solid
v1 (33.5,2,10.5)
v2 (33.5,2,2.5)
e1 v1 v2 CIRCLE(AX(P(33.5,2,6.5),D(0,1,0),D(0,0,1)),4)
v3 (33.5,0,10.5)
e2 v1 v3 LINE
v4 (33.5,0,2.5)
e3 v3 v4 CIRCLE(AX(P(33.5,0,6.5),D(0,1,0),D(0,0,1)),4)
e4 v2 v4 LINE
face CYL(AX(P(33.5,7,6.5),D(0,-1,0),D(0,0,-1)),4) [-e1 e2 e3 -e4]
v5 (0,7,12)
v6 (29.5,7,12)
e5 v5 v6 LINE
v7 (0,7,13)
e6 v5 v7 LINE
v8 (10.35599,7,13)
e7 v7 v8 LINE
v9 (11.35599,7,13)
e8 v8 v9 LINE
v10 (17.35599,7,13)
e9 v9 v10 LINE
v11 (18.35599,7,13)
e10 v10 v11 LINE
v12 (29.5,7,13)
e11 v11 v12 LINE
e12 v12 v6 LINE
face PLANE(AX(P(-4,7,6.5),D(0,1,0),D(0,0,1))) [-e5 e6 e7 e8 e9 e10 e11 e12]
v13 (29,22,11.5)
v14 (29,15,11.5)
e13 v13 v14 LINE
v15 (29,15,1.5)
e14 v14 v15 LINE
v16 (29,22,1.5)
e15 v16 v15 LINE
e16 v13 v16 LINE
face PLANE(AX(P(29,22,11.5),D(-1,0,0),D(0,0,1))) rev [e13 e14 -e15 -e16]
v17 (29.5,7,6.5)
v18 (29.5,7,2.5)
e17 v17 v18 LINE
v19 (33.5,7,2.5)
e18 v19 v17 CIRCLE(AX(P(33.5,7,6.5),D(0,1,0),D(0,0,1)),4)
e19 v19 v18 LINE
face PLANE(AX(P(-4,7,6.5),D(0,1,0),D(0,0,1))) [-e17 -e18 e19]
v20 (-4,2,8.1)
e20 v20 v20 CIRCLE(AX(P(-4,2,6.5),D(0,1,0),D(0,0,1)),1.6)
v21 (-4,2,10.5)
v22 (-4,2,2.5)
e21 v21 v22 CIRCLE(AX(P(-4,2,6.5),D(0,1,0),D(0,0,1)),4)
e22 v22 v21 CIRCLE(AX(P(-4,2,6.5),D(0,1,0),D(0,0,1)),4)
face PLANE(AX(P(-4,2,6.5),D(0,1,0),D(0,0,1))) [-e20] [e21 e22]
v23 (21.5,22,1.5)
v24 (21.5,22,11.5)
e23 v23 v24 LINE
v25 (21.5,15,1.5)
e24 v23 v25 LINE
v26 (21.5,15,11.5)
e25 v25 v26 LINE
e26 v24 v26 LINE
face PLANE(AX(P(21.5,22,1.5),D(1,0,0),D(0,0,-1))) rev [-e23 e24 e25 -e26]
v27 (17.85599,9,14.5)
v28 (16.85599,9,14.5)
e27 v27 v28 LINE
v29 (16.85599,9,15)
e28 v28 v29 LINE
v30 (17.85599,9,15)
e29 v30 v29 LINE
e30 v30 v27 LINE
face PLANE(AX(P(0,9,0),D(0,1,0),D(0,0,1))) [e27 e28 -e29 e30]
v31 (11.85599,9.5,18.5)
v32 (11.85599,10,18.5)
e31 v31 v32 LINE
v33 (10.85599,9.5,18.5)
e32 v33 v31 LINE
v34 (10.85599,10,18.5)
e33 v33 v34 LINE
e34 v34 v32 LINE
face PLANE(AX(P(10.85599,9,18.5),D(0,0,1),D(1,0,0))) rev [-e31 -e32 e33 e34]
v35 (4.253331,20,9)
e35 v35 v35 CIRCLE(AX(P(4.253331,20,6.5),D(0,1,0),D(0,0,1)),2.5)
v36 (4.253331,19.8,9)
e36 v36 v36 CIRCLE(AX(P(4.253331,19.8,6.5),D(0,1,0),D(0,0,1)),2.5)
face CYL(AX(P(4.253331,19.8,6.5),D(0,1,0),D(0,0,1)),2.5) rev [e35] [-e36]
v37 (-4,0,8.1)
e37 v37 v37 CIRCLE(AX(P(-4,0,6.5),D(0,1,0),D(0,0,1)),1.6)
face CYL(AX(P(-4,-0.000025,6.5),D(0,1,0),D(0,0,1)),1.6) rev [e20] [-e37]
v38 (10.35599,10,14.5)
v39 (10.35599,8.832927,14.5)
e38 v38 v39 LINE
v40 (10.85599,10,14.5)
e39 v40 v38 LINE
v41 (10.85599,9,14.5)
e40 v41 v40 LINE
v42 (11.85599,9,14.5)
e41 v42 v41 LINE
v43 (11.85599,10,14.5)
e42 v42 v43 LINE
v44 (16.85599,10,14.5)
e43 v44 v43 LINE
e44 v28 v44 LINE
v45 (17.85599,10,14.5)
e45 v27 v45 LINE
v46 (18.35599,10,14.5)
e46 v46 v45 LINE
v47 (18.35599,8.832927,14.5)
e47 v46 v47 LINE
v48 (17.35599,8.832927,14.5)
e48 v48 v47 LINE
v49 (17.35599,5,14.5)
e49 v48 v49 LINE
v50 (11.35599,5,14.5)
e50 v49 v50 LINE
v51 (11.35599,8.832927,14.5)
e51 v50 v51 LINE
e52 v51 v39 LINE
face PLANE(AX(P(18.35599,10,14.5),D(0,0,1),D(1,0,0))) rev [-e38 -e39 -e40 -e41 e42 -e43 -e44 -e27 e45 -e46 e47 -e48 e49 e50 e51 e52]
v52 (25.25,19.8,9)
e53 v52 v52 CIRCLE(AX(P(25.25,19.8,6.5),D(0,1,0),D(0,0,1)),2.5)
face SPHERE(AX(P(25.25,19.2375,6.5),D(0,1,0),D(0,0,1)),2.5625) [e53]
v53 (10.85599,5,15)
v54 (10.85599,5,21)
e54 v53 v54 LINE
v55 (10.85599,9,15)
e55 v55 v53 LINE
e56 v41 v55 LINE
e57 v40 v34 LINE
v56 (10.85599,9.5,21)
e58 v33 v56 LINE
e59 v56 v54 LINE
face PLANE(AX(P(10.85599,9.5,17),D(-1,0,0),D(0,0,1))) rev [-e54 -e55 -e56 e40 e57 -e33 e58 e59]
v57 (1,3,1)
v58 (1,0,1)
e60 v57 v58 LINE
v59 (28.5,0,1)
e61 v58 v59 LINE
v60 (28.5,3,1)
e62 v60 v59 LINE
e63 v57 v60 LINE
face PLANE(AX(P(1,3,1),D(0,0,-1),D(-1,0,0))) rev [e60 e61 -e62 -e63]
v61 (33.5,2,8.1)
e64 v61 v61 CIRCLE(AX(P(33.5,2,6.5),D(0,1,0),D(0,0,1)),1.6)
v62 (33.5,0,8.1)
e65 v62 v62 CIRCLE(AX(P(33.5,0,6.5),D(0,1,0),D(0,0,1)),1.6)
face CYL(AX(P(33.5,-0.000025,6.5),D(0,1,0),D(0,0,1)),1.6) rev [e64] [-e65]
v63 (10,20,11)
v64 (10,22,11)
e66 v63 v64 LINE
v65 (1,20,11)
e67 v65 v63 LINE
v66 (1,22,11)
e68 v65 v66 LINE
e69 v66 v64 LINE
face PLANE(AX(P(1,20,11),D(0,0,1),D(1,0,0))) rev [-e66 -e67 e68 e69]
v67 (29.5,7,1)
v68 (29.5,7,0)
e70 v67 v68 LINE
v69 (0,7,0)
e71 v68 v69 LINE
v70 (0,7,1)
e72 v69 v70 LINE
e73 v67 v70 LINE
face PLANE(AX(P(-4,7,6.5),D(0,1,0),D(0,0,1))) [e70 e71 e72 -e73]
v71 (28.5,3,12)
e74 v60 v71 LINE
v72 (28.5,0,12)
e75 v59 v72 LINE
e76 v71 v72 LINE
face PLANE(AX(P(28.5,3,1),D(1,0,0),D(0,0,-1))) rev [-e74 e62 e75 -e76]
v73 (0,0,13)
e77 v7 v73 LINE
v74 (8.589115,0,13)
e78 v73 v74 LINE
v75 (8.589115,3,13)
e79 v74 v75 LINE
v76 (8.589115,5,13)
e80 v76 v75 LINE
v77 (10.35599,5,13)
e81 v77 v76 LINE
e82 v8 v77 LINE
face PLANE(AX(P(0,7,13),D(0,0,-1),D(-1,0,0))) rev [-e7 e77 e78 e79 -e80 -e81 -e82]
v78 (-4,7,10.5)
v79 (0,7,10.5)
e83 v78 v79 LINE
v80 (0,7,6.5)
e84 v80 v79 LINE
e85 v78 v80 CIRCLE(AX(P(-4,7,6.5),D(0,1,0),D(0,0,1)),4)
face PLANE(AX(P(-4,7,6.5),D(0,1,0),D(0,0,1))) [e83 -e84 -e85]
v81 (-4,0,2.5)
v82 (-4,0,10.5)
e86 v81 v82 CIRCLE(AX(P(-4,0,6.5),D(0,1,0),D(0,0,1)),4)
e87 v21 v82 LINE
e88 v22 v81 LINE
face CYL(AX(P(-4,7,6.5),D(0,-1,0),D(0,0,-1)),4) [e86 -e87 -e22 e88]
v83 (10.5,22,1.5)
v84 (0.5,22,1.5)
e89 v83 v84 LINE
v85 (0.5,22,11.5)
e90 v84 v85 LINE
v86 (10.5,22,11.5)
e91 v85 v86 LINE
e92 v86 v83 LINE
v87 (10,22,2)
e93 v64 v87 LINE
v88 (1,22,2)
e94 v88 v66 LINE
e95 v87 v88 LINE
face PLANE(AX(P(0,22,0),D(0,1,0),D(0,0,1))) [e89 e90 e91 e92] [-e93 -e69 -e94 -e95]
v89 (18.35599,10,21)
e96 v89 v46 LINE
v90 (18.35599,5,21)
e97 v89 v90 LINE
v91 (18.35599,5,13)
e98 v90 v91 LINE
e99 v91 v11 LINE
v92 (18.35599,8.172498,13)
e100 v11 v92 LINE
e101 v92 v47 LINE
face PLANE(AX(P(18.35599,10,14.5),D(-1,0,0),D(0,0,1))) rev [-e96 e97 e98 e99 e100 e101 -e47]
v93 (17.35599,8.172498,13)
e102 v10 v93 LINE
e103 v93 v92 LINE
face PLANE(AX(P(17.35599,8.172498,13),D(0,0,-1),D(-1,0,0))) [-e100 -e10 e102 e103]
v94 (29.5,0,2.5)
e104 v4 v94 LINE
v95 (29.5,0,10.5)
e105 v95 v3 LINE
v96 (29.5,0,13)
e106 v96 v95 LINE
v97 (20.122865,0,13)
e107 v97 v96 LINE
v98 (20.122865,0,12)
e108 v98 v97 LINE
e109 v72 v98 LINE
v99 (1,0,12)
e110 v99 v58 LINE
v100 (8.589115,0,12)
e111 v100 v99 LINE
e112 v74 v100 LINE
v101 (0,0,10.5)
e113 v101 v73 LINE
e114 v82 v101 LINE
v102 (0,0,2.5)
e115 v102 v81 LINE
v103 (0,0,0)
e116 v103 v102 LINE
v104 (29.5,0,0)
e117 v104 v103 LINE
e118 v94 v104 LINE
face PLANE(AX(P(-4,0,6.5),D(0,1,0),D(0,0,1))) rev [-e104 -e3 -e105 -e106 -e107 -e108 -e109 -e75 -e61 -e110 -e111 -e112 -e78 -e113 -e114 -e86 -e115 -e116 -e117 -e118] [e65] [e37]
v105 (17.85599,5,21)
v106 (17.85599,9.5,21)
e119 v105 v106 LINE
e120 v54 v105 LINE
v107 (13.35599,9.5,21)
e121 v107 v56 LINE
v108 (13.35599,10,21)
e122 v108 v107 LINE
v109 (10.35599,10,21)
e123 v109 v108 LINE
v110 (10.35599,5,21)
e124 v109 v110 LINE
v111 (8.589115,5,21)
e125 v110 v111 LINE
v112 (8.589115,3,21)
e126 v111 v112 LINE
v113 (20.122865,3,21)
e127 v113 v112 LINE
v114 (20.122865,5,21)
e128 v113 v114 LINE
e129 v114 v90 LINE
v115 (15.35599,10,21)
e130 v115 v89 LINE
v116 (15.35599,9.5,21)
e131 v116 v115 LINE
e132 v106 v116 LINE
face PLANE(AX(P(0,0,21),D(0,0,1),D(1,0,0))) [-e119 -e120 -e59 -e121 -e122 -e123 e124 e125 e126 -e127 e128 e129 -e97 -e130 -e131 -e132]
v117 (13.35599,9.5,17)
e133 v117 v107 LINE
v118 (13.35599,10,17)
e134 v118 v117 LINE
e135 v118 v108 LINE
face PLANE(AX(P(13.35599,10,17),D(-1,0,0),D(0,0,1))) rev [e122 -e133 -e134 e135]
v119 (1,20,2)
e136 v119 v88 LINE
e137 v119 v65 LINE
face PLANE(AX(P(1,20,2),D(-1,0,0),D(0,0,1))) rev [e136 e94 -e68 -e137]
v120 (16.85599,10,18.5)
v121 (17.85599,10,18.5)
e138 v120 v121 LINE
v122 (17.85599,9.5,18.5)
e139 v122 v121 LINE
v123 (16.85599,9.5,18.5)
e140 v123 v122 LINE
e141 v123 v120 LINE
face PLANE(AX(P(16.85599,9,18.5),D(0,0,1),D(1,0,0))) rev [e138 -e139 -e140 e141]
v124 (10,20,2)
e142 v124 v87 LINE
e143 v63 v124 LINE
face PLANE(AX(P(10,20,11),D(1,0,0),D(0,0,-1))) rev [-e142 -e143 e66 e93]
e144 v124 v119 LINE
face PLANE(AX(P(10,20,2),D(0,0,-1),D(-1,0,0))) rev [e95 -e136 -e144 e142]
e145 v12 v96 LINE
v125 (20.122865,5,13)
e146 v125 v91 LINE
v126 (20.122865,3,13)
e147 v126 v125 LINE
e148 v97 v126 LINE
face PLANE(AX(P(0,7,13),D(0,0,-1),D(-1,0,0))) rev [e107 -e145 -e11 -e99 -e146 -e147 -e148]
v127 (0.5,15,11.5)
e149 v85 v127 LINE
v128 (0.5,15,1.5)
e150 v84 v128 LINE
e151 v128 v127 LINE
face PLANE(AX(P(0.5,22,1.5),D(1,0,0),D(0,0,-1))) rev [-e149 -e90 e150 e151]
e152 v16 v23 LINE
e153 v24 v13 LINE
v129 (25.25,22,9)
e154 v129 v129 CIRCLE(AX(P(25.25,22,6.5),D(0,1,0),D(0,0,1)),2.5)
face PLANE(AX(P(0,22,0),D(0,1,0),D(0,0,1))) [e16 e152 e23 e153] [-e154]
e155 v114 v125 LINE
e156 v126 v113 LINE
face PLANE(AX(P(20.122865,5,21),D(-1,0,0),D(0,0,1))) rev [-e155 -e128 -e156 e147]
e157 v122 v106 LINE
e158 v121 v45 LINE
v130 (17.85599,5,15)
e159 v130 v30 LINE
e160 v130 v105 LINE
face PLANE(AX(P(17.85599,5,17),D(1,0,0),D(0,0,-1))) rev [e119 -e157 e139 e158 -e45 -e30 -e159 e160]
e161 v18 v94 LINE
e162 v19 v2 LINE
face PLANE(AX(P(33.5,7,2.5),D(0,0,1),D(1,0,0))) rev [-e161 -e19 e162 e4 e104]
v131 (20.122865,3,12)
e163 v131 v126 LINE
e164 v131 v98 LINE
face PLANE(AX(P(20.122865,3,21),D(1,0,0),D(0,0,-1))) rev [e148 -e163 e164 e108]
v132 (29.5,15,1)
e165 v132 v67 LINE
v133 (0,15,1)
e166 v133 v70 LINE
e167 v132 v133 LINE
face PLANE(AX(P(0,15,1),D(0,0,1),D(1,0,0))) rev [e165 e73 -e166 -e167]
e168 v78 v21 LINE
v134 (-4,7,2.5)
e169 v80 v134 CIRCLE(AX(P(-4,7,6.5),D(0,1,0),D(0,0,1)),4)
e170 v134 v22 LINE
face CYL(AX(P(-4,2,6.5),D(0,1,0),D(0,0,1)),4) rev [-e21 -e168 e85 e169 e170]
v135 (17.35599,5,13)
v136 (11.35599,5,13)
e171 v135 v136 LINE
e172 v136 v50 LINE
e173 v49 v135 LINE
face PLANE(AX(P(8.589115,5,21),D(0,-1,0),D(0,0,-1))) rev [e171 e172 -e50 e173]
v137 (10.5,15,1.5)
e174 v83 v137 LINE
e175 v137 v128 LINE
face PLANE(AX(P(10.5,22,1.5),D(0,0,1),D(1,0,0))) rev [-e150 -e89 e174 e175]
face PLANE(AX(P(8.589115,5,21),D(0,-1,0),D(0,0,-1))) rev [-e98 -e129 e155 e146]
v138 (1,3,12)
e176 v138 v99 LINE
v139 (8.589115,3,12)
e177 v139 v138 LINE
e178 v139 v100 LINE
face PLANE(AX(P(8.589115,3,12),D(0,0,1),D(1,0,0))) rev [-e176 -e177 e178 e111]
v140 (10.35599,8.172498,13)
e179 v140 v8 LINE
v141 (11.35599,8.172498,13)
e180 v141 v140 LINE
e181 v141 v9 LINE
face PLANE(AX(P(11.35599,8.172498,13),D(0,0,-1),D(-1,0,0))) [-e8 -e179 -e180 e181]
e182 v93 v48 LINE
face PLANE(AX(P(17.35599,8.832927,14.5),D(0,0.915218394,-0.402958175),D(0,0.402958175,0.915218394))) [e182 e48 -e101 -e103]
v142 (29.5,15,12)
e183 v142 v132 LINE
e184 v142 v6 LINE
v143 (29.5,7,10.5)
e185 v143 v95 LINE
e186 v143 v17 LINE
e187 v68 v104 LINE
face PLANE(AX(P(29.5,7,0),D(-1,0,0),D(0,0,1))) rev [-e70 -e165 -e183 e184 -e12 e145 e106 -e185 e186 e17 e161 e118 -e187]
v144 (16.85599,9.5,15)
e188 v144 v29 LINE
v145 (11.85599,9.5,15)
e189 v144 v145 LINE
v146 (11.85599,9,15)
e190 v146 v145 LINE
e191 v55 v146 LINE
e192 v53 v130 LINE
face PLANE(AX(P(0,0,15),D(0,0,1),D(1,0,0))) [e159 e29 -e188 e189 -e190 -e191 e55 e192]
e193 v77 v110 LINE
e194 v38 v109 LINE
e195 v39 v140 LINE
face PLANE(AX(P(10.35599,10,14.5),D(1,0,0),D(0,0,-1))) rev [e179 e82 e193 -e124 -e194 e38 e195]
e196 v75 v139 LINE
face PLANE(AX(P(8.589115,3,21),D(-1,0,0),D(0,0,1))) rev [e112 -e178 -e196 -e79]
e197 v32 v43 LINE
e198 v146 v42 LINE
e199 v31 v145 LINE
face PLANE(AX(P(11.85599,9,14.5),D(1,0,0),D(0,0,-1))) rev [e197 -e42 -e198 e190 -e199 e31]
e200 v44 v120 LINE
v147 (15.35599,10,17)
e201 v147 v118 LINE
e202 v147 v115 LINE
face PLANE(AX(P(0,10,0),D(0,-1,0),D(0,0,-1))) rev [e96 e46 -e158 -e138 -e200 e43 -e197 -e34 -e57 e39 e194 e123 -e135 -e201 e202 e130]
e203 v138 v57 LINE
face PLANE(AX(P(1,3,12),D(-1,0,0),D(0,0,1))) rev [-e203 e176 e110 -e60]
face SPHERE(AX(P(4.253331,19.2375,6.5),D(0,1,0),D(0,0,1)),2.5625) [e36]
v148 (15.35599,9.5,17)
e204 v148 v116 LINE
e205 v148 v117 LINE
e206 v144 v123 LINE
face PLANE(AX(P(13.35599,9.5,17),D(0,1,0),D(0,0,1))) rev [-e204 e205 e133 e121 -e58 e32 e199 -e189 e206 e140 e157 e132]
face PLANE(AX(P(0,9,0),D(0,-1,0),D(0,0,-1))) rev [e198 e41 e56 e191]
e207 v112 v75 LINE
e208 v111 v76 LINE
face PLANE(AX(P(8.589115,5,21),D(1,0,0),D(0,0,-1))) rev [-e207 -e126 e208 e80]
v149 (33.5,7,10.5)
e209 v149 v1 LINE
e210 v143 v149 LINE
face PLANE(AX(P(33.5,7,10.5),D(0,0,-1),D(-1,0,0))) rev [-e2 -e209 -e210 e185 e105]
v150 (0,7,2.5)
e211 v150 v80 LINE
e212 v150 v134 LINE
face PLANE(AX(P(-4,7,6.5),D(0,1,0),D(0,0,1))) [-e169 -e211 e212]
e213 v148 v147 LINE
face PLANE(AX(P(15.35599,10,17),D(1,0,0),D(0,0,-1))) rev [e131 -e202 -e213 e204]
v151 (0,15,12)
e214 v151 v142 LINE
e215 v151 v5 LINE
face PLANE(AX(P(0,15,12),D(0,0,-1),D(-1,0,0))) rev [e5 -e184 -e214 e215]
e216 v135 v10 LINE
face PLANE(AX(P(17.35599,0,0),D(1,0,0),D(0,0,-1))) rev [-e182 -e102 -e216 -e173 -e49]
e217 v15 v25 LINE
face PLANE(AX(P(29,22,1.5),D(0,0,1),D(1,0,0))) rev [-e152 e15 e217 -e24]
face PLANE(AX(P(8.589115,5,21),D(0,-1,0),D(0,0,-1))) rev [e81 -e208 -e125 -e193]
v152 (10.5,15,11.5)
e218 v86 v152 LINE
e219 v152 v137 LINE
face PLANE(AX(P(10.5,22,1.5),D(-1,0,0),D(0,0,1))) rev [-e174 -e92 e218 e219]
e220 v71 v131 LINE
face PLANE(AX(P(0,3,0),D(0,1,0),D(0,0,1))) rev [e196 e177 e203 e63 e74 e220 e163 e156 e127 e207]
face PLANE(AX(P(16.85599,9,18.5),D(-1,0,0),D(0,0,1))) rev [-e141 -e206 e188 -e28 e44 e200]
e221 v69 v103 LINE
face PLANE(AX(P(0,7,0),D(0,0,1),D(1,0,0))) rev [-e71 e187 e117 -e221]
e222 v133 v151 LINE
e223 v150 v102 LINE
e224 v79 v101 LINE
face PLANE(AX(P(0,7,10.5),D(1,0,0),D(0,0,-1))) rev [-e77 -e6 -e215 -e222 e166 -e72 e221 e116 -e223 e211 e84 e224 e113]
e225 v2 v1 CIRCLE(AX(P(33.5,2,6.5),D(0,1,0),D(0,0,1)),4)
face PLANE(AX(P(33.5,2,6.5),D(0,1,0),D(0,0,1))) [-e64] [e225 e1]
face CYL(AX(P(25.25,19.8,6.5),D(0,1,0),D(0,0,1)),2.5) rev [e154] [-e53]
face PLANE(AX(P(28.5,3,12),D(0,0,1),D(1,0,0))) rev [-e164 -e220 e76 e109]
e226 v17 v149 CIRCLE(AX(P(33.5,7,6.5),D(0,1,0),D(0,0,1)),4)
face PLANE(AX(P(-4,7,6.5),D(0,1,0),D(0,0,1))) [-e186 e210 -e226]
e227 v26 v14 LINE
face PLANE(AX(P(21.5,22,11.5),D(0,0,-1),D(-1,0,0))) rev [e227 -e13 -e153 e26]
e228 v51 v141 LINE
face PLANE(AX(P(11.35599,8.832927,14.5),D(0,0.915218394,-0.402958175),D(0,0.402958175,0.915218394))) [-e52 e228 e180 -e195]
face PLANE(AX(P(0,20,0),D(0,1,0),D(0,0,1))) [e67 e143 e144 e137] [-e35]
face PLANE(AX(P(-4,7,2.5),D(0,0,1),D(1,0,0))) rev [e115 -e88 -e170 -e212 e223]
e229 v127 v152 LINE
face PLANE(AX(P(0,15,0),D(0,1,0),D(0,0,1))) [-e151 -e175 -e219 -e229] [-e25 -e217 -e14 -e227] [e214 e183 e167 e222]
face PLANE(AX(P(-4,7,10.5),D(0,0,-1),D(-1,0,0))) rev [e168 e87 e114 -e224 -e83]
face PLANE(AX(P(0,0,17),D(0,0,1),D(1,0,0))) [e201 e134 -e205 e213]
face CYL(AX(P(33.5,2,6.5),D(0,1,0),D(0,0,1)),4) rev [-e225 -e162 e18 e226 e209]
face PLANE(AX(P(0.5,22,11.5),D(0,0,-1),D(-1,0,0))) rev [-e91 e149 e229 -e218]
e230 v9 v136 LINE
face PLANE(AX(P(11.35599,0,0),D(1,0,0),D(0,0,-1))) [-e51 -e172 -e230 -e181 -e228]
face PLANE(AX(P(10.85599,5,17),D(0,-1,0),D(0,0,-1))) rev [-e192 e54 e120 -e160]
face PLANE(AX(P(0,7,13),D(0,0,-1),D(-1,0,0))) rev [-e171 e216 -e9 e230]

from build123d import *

# Parameters (mm, degrees)
EXTRUDE_1_DEPTH     = 7
CUT_EXTRUDE_START   = -5
SKETCH_2_R          = 4
CUT_EXTRUDE_1_DEPTH = 5
SKETCH_3_W          = 29.5
SKETCH_3_H          = 11
EXTRUDE_2_DEPTH     = 8
SKETCH_4_W          = 7.5
SKETCH_4_H          = 10
SKETCH_4_W_2        = 10
EXTRUDE_3_DEPTH     = 7
SKETCH_5_W          = 9
SKETCH_5_H          = 9
CUT_EXTRUDE_2_DEPTH = 2
SKETCH_6_R          = 2.5
CUT_EXTRUDE_3_DEPTH = 2.2
SKETCH_7_R          = 1.6
CUT_EXTRUDE_4_DEPTH = 45.443784717
SKETCH_8_W          = 11.533749137
SKETCH_8_H          = 5
EXTRUDE_4_DEPTH     = 8
CUT_EXTRUDE_5_DEPTH = 3
SKETCH_11_W         = 8
SKETCH_11_H         = 6.5
EXTRUDE_6_DEPTH     = 5
EXTRUDE_7_DEPTH     = 1
EXTRUDE_8_DEPTH     = 1
CUT_EXTRUDE_6_DEPTH = 4
SKETCH_15_W         = 7
SKETCH_15_H         = 4.5
CUT_EXTRUDE_7_DEPTH = 2
SKETCH_16_W         = 1
SKETCH_16_H         = 4
CUT_EXTRUDE_8_DEPTH = 1


# Read off the part's stored shape, not the designer's step: 圆顶1, 圆顶2
with BuildPart() as part:
    # 草图1 → 凸台-拉伸1 (new body)
    with BuildSketch(Plane(origin=(0, 0, 0), x_dir=(1, 0, 0), z_dir=(0, 1, 0))):
        with BuildLine():
            Line((0, 0), (29.5, 0))
            Line((29.5, 0), (29.5, -2.5))
            Line((29.5, -2.5), (33.5, -2.5))
            ThreePointArc((33.5, -2.5), (37.5, -6.5), (33.5, -10.5))
            Line((33.5, -10.5), (29.5, -10.5))
            Line((29.5, -10.5), (29.5, -13))
            Line((29.5, -13), (0, -13))
            Line((0, -13), (0, -10.5))
            Line((0, -10.5), (-4, -10.5))
            ThreePointArc((-4, -10.5), (-8, -6.5), (-4, -2.5))
            Line((-4, -2.5), (0, -2.5))
            Line((0, -2.5), (0, 0))
        make_face()
    extrude(amount=EXTRUDE_1_DEPTH)

    # 草图2 → 切除-拉伸1 (cut)
    with BuildSketch(Plane(origin=(0, 7, 0), x_dir=(1, 0, 0), z_dir=(0, 1, 0)).offset(CUT_EXTRUDE_START)):
        with Locations((-4, -6.5)):
            Circle(SKETCH_2_R)
        with Locations((33.5, -6.5)):
            Circle(SKETCH_2_R)
    extrude(amount=CUT_EXTRUDE_1_DEPTH, mode=Mode.SUBTRACT)

    # 草图3 → 凸台-拉伸2 (add)
    with BuildSketch(Plane(origin=(0, 7, 0), x_dir=(1, 0, 0), z_dir=(0, 1, 0))):
        with Locations((14.75, -6.5)):
            Rectangle(SKETCH_3_W, SKETCH_3_H)
    extrude(amount=EXTRUDE_2_DEPTH)

    # 草图4 → 凸台-拉伸3 (add)
    with BuildSketch(Plane(origin=(0, 15, 0), x_dir=(1, 0, 0), z_dir=(0, 1, 0))):
        with Locations((25.25, -6.5)):
            Rectangle(SKETCH_4_W, SKETCH_4_H)
        with Locations((5.5, -6.5)):
            Rectangle(SKETCH_4_W_2, SKETCH_4_H)
    extrude(amount=EXTRUDE_3_DEPTH)

    # 草图5 → 切除-拉伸2 (cut)
    with BuildSketch(Plane(origin=(0, 22, 0), x_dir=(1, 0, 0), z_dir=(0, 1, 0))):
        with Locations((5.5, -6.5)):
            Rectangle(SKETCH_5_W, SKETCH_5_H)
    extrude(amount=-CUT_EXTRUDE_2_DEPTH, mode=Mode.SUBTRACT)

    # 草图6 → 切除-拉伸3 (cut)
    with BuildSketch(Plane(origin=(0, 22, 0), x_dir=(1, 0, 0), z_dir=(0, 1, 0))):
        with Locations(Location((25.25, -6.5, 0), (0, 0, 270))):
            Circle(SKETCH_6_R)
        with Locations(Location((4.253331237, -6.5, 0), (0, 0, 270))):
            Circle(SKETCH_6_R)
    extrude(amount=-CUT_EXTRUDE_3_DEPTH, mode=Mode.SUBTRACT)

    # 圆顶1 outline → 圆顶1 (revolve)
    with BuildSketch(Plane(origin=(4.253331237, 0, 6.5), x_dir=(1, 0, 0), z_dir=(0, 0, 1))):
        with BuildLine():
            Line((0, 19.8), (2.500000001, 19.799999998))
            ThreePointArc((2.500000001, 19.799999998), (1.60078106, 21.238476323), (0, 21.8))
            Line((0, 21.8), (0, 19.8))
        make_face()
    revolve(axis=Axis((4.253331237, 0, 6.5), (0, 1, 0)))

    # 圆顶2 outline → 圆顶2 (revolve)
    with BuildSketch(Plane(origin=(25.25, 0, 6.5), x_dir=(1, 0, 0), z_dir=(0, 0, 1))):
        with BuildLine():
            Line((0, 19.8), (2.500000001, 19.799999997))
            ThreePointArc((2.500000001, 19.799999997), (1.60078106, 21.238476323), (0, 21.8))
            Line((0, 21.8), (0, 19.8))
        make_face()
    revolve(axis=Axis((25.25, 0, 6.5), (0, 1, 0)))

    # 草图7 → 切除-拉伸4 (cut, through all)
    with BuildSketch(Plane(origin=(0, 2, 0), x_dir=(1, 0, 0), z_dir=(0, 1, 0))):
        with Locations(Location((-4, -6.5, 0), (0, 0, 270))):
            Circle(SKETCH_7_R)
        with Locations(Location((33.5, -6.5, 0), (0, 0, 270))):
            Circle(SKETCH_7_R)
    extrude(amount=-CUT_EXTRUDE_4_DEPTH, mode=Mode.SUBTRACT)

    # 草图8 → 凸台-拉伸4 (add)
    with BuildSketch(Plane.XY.offset(13)):
        with Locations((14.355989937, 2.5)):
            Rectangle(SKETCH_8_W, SKETCH_8_H)
    extrude(amount=EXTRUDE_4_DEPTH)

    # 草图10 → 切除-拉伸5 (cut)
    with BuildSketch(Plane.XZ):
        Polygon((8.589115368, 21), (8.589115368, 12), (1, 12), (1, 1), (28.5, 1), (28.5, 12), (20.122864505, 12), (20.122864505, 21), align=None)
    extrude(amount=-CUT_EXTRUDE_5_DEPTH, mode=Mode.SUBTRACT)

    # 草图11 → 凸台-拉伸6 (add)
    with BuildSketch(Plane(origin=(0, 5, 0), x_dir=(1, 0, 0), z_dir=(0, 1, 0))):
        with Locations((14.355989936, -17.75)):
            Rectangle(SKETCH_11_W, SKETCH_11_H)
    extrude(amount=EXTRUDE_6_DEPTH)

    # 草图12 → 凸台-拉伸7 (add)
    with BuildSketch(Plane(origin=(18.355989936, 0, 0), x_dir=(0, 0, -1), z_dir=(1, 0, 0))):
        Polygon((-14.5, 8.832927064), (-13, 8.172497524), (-13, 5), (-14.5, 5), align=None)
    extrude(amount=-EXTRUDE_7_DEPTH)

    # 草图13 → 凸台-拉伸8 (add)
    with BuildSketch(Plane.ZY.offset(-10.355989936)):
        Polygon((14.5, 8.832927064), (13, 8.172497524), (13, 5), (14.5, 5), align=None)
    extrude(amount=-EXTRUDE_8_DEPTH)

    # 草图14 → 切除-拉伸6 (cut)
    with BuildSketch(Plane.XY.offset(21)):
        Polygon((10.855989936, 5), (17.855989936, 5), (17.855989936, 9.5), (15.355989936, 9.5), (15.355989936, 10), (13.355989936, 10), (13.355989936, 9.5), (10.855989936, 9.5), align=None)
    extrude(amount=-CUT_EXTRUDE_6_DEPTH, mode=Mode.SUBTRACT)

    # 草图15 → 切除-拉伸7 (cut)
    with BuildSketch(Plane.XY.offset(17)):
        with Locations((14.355989936, 7.25)):
            Rectangle(SKETCH_15_W, SKETCH_15_H)
    extrude(amount=-CUT_EXTRUDE_7_DEPTH, mode=Mode.SUBTRACT)

    # 草图16 → 切除-拉伸8 (cut)
    with BuildSketch(Plane(origin=(0, 10, 0), x_dir=(1, 0, 0), z_dir=(0, 1, 0))):
        with Locations((11.355989936, -16.5)):
            Rectangle(SKETCH_16_W, SKETCH_16_H)
        with Locations((17.355989936, -16.5)):
            Rectangle(SKETCH_16_W, SKETCH_16_H)
    extrude(amount=-CUT_EXTRUDE_8_DEPTH, mode=Mode.SUBTRACT)


solid = part.part
